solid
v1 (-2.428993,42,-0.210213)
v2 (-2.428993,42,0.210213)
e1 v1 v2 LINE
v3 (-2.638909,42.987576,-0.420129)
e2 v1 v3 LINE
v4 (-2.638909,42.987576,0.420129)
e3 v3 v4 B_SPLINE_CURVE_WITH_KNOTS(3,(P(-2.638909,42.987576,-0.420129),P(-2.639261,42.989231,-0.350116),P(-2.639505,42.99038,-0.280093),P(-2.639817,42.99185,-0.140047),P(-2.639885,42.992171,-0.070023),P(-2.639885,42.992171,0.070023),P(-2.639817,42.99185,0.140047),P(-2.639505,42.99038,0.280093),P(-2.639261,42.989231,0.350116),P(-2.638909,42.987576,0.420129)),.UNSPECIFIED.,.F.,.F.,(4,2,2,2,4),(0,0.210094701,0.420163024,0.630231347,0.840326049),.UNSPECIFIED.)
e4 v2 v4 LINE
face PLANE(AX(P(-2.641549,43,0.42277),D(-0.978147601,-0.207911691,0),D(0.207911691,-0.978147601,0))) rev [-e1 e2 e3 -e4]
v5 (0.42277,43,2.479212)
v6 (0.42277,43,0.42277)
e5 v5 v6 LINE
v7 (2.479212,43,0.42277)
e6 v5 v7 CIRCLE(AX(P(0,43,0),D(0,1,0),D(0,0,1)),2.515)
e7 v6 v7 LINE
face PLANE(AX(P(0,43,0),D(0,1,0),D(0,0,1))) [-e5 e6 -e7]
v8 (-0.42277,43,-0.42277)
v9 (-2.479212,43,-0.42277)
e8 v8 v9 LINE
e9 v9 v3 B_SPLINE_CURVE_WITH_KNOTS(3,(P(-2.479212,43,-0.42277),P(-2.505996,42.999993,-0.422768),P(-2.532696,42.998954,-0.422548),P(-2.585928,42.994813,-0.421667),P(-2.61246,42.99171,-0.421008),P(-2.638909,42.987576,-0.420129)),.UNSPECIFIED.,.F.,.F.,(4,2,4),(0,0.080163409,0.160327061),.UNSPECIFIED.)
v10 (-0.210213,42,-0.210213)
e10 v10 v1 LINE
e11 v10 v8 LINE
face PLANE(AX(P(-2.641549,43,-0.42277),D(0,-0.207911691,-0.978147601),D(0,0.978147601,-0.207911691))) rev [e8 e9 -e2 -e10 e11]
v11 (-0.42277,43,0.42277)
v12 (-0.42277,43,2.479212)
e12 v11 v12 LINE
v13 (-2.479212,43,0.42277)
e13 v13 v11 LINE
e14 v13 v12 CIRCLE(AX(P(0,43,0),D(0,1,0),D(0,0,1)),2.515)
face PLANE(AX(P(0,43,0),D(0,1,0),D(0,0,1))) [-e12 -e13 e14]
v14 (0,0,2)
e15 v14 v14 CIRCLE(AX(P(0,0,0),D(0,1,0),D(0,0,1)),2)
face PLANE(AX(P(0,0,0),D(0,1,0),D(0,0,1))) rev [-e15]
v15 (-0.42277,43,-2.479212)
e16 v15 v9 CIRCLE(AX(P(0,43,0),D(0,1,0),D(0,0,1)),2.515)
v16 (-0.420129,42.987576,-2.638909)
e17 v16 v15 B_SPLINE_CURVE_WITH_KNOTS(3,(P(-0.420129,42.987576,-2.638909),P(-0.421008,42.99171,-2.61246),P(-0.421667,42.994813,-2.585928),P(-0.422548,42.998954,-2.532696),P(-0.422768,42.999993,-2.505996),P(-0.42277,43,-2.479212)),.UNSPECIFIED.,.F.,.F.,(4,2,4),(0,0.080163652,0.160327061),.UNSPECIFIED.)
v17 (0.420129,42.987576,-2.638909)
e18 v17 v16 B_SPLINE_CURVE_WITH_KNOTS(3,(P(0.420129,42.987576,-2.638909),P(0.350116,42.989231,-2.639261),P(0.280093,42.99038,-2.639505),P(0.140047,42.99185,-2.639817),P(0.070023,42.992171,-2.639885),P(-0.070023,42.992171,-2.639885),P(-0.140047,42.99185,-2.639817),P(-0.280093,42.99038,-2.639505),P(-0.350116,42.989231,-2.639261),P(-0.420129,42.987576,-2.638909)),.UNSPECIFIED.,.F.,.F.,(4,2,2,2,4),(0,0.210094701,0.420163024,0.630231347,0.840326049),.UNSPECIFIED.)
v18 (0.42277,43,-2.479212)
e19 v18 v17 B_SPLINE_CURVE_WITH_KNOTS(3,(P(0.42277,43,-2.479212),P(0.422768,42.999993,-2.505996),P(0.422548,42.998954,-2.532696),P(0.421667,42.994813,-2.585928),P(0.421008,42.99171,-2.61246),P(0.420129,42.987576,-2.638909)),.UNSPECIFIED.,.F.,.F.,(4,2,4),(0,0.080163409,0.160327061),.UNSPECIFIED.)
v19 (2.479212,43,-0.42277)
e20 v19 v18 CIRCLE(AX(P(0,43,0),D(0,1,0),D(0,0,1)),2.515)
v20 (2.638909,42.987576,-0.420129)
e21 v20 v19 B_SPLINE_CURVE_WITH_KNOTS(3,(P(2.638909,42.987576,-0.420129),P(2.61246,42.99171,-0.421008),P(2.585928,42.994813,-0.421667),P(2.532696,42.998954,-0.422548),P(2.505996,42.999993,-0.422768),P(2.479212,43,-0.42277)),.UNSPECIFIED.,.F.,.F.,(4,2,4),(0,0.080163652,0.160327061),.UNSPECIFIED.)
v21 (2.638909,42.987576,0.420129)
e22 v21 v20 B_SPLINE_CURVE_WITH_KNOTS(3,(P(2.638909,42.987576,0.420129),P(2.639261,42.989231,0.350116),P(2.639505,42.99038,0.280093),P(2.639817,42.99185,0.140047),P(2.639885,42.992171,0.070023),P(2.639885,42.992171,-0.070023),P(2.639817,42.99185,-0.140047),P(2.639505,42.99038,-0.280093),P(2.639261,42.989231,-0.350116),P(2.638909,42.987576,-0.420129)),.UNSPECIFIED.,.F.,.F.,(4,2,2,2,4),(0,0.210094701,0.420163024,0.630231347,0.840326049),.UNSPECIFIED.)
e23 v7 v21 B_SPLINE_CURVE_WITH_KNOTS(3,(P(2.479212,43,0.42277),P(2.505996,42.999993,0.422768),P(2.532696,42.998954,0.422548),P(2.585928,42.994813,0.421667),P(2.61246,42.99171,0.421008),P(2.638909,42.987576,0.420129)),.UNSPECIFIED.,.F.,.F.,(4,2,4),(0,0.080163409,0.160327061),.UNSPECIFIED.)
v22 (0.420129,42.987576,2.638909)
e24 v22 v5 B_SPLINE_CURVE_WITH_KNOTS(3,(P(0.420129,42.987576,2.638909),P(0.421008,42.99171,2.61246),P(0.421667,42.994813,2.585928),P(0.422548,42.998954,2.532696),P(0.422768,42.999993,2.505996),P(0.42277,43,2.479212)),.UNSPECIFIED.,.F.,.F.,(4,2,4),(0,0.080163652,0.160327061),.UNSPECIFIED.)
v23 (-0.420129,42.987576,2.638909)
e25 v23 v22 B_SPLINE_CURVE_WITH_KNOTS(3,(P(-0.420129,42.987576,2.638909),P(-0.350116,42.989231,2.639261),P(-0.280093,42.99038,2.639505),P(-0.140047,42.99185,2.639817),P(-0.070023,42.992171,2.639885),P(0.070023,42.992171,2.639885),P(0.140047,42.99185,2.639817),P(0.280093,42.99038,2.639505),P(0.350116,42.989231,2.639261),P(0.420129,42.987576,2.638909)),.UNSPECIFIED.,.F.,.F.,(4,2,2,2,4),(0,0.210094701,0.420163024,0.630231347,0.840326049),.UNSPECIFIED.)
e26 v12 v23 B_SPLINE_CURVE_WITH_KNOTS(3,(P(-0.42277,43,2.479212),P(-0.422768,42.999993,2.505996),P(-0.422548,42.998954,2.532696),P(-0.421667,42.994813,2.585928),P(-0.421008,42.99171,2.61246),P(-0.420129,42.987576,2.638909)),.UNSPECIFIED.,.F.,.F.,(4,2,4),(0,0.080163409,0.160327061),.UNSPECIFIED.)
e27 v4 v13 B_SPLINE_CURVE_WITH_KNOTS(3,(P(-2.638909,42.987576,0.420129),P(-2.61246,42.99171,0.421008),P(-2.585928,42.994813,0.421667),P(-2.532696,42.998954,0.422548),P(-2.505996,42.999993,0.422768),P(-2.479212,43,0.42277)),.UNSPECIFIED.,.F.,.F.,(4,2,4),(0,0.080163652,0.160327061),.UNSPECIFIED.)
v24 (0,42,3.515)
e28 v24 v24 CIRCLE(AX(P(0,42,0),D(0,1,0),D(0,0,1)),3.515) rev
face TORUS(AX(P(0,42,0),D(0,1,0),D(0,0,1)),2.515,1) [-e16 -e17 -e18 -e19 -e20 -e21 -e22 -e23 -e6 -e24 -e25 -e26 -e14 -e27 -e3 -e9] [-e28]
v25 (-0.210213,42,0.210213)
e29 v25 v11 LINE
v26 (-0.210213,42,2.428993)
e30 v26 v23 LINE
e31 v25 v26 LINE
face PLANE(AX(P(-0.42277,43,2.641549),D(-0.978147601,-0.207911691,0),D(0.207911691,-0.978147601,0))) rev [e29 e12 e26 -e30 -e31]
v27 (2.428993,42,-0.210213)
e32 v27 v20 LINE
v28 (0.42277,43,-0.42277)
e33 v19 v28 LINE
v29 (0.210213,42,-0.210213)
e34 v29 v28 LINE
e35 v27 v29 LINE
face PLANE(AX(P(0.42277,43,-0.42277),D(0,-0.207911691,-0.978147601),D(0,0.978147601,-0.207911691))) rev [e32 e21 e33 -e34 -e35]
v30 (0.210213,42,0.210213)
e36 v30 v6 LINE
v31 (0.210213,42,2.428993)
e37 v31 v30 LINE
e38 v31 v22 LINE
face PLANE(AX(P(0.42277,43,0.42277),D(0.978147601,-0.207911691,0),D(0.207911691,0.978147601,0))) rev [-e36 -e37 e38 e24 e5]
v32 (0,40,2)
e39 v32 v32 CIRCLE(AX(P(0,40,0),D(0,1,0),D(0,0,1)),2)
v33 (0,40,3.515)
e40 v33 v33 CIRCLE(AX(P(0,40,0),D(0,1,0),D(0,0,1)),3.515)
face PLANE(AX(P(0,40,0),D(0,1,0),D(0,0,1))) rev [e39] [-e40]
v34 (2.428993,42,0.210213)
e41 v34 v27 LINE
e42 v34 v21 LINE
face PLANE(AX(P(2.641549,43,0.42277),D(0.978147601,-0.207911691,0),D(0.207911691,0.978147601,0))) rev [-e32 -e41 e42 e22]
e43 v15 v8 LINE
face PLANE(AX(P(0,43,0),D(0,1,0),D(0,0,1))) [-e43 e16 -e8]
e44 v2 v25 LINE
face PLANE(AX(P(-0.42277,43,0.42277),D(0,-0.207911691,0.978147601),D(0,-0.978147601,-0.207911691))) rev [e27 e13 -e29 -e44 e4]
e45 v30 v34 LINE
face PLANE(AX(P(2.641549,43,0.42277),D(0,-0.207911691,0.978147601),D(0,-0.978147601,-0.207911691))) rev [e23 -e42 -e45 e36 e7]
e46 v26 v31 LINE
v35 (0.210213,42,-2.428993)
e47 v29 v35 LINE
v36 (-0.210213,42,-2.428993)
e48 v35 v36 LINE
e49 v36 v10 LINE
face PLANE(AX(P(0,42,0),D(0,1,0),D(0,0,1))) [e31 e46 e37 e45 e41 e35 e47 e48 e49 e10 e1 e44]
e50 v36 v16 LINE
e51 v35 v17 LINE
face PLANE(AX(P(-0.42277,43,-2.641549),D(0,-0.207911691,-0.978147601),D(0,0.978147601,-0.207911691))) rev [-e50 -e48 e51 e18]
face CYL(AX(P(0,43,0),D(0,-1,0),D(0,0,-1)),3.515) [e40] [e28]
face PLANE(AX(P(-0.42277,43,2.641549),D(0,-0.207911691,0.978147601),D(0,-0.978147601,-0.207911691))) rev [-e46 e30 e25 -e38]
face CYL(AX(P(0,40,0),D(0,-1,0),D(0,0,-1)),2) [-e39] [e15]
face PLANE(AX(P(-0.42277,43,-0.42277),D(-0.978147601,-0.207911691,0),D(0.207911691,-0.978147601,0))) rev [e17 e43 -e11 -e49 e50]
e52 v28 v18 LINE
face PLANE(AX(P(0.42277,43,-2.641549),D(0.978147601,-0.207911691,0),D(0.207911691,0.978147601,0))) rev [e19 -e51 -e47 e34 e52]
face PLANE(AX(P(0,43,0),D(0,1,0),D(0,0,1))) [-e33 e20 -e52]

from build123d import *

# Parameters (mm, degrees)
SKETCH_1_R          = 2
EXTRUDE_1_DEPTH     = 40
SKETCH_2_R          = 3.515
EXTRUDE_2_DEPTH     = 3
CUT_EXTRUDE_1_DEPTH = 1
CUT_EXTRUDE_1_DRAFT = -12
FILLET_2_R          = 1


with BuildPart() as part:
    # Эскиз1 → Бобышка-Вытянуть1 (new body)
    with BuildSketch(Plane(origin=(0, 0, 0), x_dir=(1, 0, 0), z_dir=(0, 1, 0))):
        with Locations(Location((0, 0, 0), (0, 0, 270))):
            Circle(SKETCH_1_R)
    extrude(amount=EXTRUDE_1_DEPTH)

    # Эскиз2 → Бобышка-Вытянуть2 (add)
    with BuildSketch(Plane(origin=(0, 40, 0), x_dir=(1, 0, 0), z_dir=(0, 1, 0))):
        with Locations(Location((0, 0, 0), (0, 0, 270))):
            Circle(SKETCH_2_R)
    extrude(amount=EXTRUDE_2_DEPTH)


with BuildPart() as cut_extrude_1_tool:
    # Эскиз3 → Вырез-Вытянуть1 (with draft: the straight prism first)
    with BuildSketch(Plane(origin=(0, 43, 0), x_dir=(1, 0, 0), z_dir=(0, 1, 0))):
        Polygon((-2.641549473, 0.422769916), (-2.641549473, -0.422769916), (-0.422769916, -0.422769916), (-0.422769916, -2.641549473), (0.422769916, -2.641549473), (0.422769916, -0.422769916), (2.641549473, -0.422769916), (2.641549473, 0.422769916), (0.422769916, 0.422769916), (0.422769916, 2.641549473), (-0.422769916, 2.641549473), (-0.422769916, 0.422769916), align=None)
    extrude(amount=-CUT_EXTRUDE_1_DEPTH)
    # Вырез-Вытянуть1: the draft: its side faces are tilted about the plane it starts from
    cut_extrude_1_sides = [cut_extrude_1_tool.faces().sort_by_distance(p)[0] for p in [
        (-2.641549473, 42.5, 0),
        (-1.532159694, 42.5, 0.422769916),
        (-0.422769916, 42.5, 1.532159694),
        (0, 42.5, 2.641549473),
        (0.422769916, 42.5, 1.532159694),
        (1.532159694, 42.5, 0.422769916),
        (2.641549473, 42.5, 0),
        (1.532159694, 42.5, -0.422769916),
        (0.422769916, 42.5, -1.532159694),
        (0, 42.5, -2.641549473),
        (-0.422769916, 42.5, -1.532159694),
        (-1.532159694, 42.5, -0.422769916),
    ]]
    draft(cut_extrude_1_sides, Plane(origin=(0, 43, 0), x_dir=(1, 0, 0), z_dir=(0, 1, 0)), CUT_EXTRUDE_1_DRAFT)


with BuildPart() as part_1:
    add(part.part)

    # Вырез-Вытянуть1: cut by cut_extrude_1_tool
    add(cut_extrude_1_tool.part, mode=Mode.SUBTRACT)

    # Скругление2
    # the kernel refuses this fillet: 1 mm, written as the material it takes off along each edge
    with BuildSketch(Plane(origin=(0, 43, 0), x_dir=(0, 0, 1), z_dir=(-1, 0, 0))) as fillet_2_piece_1:
        with BuildLine():
            CenterArc((3.515 - FILLET_2_R, -FILLET_2_R), FILLET_2_R, 0, 90)
            Line((3.515 - FILLET_2_R, 0), (3.515, 0))
            Line((3.515, 0), (3.515, -FILLET_2_R))
        make_face()
    revolve(axis=Axis((0, 43, 0), (0, 1, 0)), mode=Mode.SUBTRACT)


solid = part_1.part
